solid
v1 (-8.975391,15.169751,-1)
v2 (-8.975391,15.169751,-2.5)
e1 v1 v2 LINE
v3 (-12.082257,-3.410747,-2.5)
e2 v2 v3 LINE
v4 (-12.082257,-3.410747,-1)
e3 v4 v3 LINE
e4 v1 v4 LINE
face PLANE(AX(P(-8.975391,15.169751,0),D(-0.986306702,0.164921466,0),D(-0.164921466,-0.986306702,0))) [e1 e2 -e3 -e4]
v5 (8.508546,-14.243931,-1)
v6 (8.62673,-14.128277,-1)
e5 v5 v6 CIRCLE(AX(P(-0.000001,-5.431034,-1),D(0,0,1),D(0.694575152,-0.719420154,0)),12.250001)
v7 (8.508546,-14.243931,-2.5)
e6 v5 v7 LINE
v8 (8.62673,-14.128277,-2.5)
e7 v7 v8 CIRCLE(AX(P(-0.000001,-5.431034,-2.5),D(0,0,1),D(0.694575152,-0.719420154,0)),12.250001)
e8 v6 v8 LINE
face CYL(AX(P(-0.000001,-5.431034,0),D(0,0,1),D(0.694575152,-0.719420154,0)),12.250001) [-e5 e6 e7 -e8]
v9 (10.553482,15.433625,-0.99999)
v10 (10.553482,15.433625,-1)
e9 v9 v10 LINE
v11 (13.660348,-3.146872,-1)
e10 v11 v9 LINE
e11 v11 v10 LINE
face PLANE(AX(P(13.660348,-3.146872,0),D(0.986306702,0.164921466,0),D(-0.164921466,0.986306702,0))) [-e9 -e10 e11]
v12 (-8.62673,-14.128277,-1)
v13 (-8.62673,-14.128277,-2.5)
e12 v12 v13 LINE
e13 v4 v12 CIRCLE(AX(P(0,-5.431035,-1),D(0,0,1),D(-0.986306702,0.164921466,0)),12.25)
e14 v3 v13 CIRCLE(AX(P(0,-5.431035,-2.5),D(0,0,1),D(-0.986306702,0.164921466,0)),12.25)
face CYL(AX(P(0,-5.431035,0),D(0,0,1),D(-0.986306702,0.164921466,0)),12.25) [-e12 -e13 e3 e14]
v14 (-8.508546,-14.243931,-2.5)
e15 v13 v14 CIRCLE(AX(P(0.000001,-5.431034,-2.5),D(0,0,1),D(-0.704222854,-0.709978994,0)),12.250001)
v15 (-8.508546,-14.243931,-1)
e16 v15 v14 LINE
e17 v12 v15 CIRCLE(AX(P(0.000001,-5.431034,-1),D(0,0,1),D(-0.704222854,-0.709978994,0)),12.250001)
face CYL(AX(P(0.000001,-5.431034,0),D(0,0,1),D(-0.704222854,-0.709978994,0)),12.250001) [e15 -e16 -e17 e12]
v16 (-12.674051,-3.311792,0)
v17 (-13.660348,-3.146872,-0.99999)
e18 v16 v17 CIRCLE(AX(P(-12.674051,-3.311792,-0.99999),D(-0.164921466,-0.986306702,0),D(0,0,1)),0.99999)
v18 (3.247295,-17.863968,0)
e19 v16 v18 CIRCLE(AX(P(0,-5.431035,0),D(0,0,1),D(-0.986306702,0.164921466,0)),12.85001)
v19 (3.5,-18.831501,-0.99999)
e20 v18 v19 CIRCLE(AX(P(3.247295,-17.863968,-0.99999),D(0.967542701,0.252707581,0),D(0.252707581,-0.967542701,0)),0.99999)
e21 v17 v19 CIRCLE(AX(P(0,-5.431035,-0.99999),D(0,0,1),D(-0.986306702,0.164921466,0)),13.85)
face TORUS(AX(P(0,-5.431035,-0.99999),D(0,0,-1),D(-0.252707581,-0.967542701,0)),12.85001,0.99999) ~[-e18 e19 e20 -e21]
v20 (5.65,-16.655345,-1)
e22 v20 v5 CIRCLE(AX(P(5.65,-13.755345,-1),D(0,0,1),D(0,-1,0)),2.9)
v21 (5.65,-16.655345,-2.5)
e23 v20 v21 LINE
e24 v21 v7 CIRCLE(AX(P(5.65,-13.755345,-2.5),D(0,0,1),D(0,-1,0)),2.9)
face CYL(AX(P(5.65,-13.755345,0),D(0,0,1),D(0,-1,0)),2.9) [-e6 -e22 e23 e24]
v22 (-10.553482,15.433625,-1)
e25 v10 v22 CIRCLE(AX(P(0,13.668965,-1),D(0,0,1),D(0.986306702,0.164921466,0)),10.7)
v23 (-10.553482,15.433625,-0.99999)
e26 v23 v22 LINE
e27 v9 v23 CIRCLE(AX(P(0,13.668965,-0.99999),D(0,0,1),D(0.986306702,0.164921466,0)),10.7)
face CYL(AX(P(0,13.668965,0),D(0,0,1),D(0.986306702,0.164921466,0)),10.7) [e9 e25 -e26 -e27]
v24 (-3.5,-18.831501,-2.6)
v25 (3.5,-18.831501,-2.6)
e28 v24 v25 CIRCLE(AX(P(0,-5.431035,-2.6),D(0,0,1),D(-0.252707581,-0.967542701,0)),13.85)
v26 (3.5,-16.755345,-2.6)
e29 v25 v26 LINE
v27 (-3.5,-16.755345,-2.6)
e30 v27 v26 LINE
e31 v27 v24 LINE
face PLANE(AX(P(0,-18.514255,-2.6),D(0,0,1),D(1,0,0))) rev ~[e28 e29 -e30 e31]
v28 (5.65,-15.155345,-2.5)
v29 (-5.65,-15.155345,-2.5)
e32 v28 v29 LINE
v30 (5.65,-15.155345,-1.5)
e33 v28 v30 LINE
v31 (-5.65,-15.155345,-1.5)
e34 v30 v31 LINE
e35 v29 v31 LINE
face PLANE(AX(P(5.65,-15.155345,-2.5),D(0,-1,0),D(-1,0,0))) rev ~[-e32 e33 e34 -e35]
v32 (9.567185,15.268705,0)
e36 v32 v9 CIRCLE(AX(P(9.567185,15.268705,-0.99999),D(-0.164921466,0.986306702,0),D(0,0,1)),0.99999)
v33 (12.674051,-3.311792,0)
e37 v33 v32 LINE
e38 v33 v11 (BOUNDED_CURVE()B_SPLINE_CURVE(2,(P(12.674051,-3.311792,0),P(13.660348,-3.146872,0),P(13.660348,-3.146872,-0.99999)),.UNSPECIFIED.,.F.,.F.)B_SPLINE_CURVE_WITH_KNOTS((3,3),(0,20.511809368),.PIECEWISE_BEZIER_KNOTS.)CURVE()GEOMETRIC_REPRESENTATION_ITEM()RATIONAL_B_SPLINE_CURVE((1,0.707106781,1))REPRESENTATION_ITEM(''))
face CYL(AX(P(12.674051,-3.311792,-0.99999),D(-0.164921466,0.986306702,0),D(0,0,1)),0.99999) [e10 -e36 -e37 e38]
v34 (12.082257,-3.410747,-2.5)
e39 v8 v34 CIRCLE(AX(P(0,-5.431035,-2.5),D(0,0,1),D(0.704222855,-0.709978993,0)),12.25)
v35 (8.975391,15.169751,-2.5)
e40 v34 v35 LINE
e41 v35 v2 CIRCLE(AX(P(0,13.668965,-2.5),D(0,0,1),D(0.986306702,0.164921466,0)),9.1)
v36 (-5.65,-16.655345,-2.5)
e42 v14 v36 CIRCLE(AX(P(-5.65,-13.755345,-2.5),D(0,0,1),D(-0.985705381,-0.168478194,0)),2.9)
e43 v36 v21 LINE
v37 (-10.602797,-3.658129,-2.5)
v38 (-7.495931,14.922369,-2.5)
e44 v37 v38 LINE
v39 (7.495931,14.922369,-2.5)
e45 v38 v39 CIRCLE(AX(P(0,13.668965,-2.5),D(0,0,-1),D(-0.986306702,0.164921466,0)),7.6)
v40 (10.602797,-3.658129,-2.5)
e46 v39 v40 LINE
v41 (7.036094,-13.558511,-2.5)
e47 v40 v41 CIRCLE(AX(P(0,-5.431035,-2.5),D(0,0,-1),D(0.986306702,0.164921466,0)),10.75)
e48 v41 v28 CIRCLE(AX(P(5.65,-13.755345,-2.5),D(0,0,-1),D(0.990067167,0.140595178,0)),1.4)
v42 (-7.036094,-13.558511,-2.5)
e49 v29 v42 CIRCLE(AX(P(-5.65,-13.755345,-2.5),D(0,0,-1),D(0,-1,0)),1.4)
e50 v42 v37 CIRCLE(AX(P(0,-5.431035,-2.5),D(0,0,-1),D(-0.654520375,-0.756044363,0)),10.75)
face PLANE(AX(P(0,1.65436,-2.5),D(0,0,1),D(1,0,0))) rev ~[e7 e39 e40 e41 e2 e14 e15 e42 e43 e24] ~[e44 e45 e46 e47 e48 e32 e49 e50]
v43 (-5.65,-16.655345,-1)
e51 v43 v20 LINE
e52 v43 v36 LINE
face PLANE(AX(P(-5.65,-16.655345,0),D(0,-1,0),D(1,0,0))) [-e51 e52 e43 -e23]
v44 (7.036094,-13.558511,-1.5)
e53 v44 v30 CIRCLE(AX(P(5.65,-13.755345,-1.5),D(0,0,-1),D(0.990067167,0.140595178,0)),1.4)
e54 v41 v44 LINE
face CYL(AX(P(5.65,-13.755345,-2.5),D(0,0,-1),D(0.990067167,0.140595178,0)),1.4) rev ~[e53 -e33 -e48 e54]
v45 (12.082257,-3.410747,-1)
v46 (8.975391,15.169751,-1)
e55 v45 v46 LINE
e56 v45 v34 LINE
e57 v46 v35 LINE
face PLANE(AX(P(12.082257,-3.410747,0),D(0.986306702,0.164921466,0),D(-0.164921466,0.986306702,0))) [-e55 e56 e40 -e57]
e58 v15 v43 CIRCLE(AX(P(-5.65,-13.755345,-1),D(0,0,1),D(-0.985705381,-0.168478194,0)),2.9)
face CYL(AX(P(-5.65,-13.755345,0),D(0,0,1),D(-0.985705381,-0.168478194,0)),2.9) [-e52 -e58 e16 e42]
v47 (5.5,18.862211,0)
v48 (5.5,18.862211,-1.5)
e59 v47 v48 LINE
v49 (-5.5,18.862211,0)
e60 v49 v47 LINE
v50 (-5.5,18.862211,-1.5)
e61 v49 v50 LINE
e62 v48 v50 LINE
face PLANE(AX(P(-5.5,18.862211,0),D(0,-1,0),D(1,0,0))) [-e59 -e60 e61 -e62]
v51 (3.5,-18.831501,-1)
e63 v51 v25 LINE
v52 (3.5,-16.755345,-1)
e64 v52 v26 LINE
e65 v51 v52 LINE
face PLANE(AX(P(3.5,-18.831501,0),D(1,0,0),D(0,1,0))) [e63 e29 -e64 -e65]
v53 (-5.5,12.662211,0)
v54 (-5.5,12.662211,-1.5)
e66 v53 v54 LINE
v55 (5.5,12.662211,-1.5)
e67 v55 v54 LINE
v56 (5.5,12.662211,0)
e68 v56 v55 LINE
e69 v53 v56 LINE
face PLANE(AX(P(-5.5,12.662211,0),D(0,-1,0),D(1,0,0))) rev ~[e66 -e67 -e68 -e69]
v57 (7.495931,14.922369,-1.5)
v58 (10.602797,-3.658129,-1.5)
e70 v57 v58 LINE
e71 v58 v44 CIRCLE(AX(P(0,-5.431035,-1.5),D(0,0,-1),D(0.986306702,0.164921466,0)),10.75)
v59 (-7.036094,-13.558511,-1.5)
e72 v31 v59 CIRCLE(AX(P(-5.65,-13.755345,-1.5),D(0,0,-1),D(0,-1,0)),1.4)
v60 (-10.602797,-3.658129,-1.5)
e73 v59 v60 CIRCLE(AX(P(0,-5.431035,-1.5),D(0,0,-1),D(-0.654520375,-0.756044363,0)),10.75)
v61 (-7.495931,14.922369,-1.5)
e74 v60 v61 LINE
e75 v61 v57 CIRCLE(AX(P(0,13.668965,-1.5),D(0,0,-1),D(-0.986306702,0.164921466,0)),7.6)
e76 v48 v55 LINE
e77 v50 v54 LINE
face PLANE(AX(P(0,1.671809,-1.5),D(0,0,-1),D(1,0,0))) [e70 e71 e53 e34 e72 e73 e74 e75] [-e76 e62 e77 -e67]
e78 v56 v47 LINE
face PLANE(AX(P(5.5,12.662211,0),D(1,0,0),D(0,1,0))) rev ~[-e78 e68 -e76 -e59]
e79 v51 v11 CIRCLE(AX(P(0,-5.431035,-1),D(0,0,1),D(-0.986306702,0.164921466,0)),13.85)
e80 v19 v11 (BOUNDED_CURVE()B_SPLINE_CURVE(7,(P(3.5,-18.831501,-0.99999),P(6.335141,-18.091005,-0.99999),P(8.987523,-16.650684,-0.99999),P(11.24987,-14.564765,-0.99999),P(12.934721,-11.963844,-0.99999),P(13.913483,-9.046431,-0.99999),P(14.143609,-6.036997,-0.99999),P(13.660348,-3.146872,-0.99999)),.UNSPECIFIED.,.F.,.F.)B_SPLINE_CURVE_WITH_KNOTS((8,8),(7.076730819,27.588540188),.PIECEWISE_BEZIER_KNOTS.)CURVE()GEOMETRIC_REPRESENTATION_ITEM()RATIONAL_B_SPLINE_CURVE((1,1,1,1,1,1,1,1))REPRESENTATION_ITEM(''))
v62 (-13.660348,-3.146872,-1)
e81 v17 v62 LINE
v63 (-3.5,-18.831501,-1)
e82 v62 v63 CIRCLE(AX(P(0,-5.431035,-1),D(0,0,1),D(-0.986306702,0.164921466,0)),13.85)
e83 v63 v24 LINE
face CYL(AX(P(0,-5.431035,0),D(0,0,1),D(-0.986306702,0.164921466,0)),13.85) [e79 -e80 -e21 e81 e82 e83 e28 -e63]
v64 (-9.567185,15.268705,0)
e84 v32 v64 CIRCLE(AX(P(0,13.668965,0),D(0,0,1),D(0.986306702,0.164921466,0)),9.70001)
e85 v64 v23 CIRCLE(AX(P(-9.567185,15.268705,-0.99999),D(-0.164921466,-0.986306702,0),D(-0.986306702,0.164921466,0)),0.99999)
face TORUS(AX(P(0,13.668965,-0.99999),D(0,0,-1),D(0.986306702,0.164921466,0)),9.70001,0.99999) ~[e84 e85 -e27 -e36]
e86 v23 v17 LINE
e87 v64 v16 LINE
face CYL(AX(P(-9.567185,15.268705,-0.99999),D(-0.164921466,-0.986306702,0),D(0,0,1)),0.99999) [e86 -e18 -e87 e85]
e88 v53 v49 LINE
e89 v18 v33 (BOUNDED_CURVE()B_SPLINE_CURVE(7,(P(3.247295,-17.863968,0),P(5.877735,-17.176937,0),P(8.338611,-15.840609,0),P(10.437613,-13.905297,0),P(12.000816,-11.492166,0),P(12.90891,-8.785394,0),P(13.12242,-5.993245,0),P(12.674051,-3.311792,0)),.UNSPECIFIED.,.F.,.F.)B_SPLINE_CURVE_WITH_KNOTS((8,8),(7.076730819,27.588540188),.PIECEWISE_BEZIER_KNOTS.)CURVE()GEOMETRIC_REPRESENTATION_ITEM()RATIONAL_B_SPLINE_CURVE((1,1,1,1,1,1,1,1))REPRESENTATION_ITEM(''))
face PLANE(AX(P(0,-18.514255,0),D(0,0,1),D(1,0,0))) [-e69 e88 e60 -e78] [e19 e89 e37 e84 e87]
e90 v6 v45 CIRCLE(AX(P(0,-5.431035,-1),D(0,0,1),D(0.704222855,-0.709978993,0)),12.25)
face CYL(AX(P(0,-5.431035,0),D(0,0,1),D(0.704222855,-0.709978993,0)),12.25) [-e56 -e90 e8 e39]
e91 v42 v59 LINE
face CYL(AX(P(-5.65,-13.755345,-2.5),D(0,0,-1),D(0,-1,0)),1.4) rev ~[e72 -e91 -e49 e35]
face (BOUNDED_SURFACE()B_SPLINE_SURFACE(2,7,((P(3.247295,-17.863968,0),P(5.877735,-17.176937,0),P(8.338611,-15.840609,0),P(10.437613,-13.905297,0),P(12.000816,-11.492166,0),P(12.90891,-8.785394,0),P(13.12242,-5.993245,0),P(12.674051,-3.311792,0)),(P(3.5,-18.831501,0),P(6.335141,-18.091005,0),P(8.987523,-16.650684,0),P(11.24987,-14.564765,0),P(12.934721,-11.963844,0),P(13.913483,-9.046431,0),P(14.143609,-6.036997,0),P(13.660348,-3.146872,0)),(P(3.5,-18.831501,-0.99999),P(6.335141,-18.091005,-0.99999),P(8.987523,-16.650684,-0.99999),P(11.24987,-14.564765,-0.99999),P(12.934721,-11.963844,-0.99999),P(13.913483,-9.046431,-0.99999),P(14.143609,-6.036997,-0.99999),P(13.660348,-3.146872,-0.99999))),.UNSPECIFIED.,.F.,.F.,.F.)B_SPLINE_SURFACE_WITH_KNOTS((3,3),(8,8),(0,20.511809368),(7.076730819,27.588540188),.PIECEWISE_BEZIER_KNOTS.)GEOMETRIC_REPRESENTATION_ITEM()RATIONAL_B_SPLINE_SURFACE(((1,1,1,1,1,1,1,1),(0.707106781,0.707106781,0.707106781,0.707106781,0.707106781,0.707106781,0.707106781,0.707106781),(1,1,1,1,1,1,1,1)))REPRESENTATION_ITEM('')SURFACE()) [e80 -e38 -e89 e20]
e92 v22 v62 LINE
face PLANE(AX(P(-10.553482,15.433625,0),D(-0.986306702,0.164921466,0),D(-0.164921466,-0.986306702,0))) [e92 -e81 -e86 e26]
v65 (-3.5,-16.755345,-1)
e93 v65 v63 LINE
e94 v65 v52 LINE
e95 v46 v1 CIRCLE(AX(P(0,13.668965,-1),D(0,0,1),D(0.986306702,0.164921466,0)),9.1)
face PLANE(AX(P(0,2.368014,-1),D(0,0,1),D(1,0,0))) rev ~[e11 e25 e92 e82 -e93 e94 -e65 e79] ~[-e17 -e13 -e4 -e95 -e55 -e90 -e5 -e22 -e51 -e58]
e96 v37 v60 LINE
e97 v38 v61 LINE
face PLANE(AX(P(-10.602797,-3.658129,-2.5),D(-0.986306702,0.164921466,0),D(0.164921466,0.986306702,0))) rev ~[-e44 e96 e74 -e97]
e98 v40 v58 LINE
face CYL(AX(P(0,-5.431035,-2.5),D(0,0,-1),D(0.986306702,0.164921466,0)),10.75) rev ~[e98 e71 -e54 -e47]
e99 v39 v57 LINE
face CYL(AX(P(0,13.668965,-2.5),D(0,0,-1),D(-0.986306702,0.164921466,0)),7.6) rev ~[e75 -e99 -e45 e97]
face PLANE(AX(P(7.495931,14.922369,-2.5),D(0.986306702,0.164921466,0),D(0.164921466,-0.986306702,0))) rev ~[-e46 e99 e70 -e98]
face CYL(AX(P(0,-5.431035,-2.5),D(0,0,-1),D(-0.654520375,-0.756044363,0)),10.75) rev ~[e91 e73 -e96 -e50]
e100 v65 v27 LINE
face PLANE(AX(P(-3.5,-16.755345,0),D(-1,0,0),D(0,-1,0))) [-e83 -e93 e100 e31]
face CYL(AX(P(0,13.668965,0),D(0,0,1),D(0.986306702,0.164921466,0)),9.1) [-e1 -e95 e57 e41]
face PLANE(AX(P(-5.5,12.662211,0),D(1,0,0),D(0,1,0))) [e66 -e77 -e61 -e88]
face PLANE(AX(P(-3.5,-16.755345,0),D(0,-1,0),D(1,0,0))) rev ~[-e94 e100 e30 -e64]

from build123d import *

# Parameters (mm, degrees)
F1_DEPTH = 1
F2_W     = 0.6565612018
F2_H     = 2.5395583361
F2_W_2   = 0.6960576609
F2_W_3   = 0.8317038625
F2_H_2   = 3.7825570011
F2_W_4   = 0.7836289912
F3_DEPTH = 2.5
F2_W_5   = 7
F2_H_3   = 1.2
F4_DEPTH = 2.6
F6_DEPTH = 1
F7_R     = 0.99999
F8_W     = 11
F8_H     = 6.2
F9_DEPTH = 6


# Not quite as in the source:
# - a fillet or chamfer is up to 0.001 mm smaller than in the source, because OpenCascade refuses the exact size


with BuildPart() as f1:
    # F0 (on Top) → F1 (new body)
    with BuildSketch(Plane.XY):
        with BuildLine():
            ThreePointArc((10.5534817095, 15.4336250836), (0, 24.3689653978), (-10.5534817095, 15.4336250836))
            Line((-10.5534817095, 15.4336250836), (-13.6603478203, -3.1468722986))
            ThreePointArc((-13.6603478203, -3.1468722986), (0, -19.2810346022), (13.6603478203, -3.1468722986))
            Line((13.6603478203, -3.1468722986), (10.5534817095, 15.4336250836))
        make_face()
        with BuildLine():
            ThreePointArc((-12.1808877675, -3.3942544975), (-10.7458713669, 0.6557337165), (-8.0101498113, 3.9689653978))
            ThreePointArc((-8.0101498113, 3.9689653978), (-7.3298242511, 6.556361809), (-8.0101498113, 9.1437582202))
            ThreePointArc((-8.0101498113, 9.1437582202), (-9.0606365073, 12.0737017575), (-9.0740216568, 15.1862428847))
            ThreePointArc((-9.0740216568, 15.1862428847), (0, 22.8689653978), (9.0740216568, 15.1862428847))
            ThreePointArc((9.0740216568, 15.1862428847), (9.0606535532, 12.0737985759), (8.0102465186, 9.1439294077))
            ThreePointArc((8.0102465186, 9.1439294077), (8.0101981654, 9.1438438137), (8.0101498113, 9.1437582202))
            ThreePointArc((8.0101498113, 9.1437582202), (7.3298242511, 6.556361809), (8.0101498113, 3.9689653978))
            ThreePointArc((8.0101498113, 3.9689653978), (10.7458713669, 0.6557337165), (12.1808877675, -3.3942544975))
            ThreePointArc((12.1808877675, -3.3942544975), (0, -17.7810346022), (-12.1808877675, -3.3942544975))
        make_face(mode=Mode.SUBTRACT)
        with BuildLine():
            Line((8.0101498113, 3.9689653978), (-8.0101498113, 3.9689653978))
            ThreePointArc((-8.0101498113, 3.9689653978), (-10.7458713669, 0.6557337165), (-12.1808877675, -3.3942544975))
            ThreePointArc((-12.1808877675, -3.3942544975), (0, -17.7810346022), (12.1808877675, -3.3942544975))
            ThreePointArc((12.1808877675, -3.3942544975), (10.7458713669, 0.6557337165), (8.0101498113, 3.9689653978))
        make_face()
        with BuildLine():
            ThreePointArc((-8.0101498113, 9.1437582202), (-7.3298242511, 6.556361809), (-8.0101498113, 3.9689653978))
            Line((-8.0101498113, 3.9689653978), (8.0101498113, 3.9689653978))
            ThreePointArc((8.0101498113, 3.9689653978), (7.3298242511, 6.556361809), (8.0101498113, 9.1437582202))
            ThreePointArc((8.0101498113, 9.1437582202), (0, 4.4689653978), (-8.0101498113, 9.1437582202))
        make_face()
        with BuildLine():
            ThreePointArc((-9.0740216568, 15.1862428847), (-9.0606365073, 12.0737017575), (-8.0101498113, 9.1437582202))
            ThreePointArc((-8.0101498113, 9.1437582202), (0, 4.4689653978), (8.0101498113, 9.1437582202))
            ThreePointArc((8.0101498113, 9.1437582202), (8.0101981654, 9.1438438137), (8.0102465186, 9.1439294077))
            ThreePointArc((8.0102465186, 9.1439294077), (9.0606535532, 12.0737985759), (9.0740216568, 15.1862428847))
            ThreePointArc((9.0740216568, 15.1862428847), (0, 22.8689653978), (-9.0740216568, 15.1862428847))
        make_face()
    extrude(amount=-F1_DEPTH)

    # F2 (on face) → F3 (join)
    with BuildSketch(Plane.XY):
        with BuildLine():
            ThreePointArc((-12.0822570973, -3.4107466441), (-11.6589837477, -9.190103366), (-8.626729972, -14.1282772682))
            ThreePointArc((-8.626729972, -14.1282772682), (-8.5678329378, -14.1863038014), (-8.5085456051, -14.2439314975))
            ThreePointArc((-8.5085456051, -14.2439314975), (-7.5199061996, -15.9719752427), (-5.65, -16.6553447357))
            Line((-5.65, -16.6553447357), (5.65, -16.6553447357))
            ThreePointArc((5.65, -16.6553447357), (7.5199061996, -15.9719752427), (8.5085456051, -14.2439314975))
            ThreePointArc((8.5085456051, -14.2439314975), (8.5678329378, -14.1863038014), (8.626729972, -14.1282772682))
            ThreePointArc((8.626729972, -14.1282772682), (11.6589837477, -9.190103366), (12.0822570973, -3.4107466441))
            Line((12.0822570973, -3.4107466441), (8.9753909866, 15.1697507381))
            ThreePointArc((8.9753909866, 15.1697507381), (0, 22.7689653978), (-8.9753909866, 15.1697507381))
            Line((-8.9753909866, 15.1697507381), (-12.0822570973, -3.4107466441))
        make_face()
        with Locations((-8.9782806009, -11.8910893798)):
            Rectangle(F2_W, F2_H, mode=Mode.SUBTRACT)
        with Locations((8.9980288304, -11.8910893798)):
            Rectangle(F2_W_2, F2_H, mode=Mode.SUBTRACT)
        with Locations((-9.0658519313, 9.3533767637)):
            Rectangle(F2_W_3, F2_H_2, mode=Mode.SUBTRACT)
        with Locations((9.0418144956, 9.3533767637)):
            Rectangle(F2_W_4, F2_H_2, mode=Mode.SUBTRACT)
        with Locations((-9.0658519313, 9.3533767637)):
            Rectangle(F2_W_3, F2_H_2)
        with Locations((9.0418144956, 9.3533767637)):
            Rectangle(F2_W_4, F2_H_2)
        with Locations((8.9980288304, -11.8910893798)):
            Rectangle(F2_W_2, F2_H)
        with Locations((-8.9782806009, -11.8910893798)):
            Rectangle(F2_W, F2_H)
    extrude(amount=-F3_DEPTH)

    # F2 (on face) → F4 (join)
    with BuildSketch(Plane.XY):
        with BuildLine():
            Line((3.5, -17.9553447357), (-3.5, -17.9553447357))
            Line((-3.5, -17.9553447357), (-3.5, -18.831501012))
            ThreePointArc((-3.5, -18.831501012), (0, -19.2810346022), (3.5, -18.831501012))
            Line((3.5, -18.831501012), (3.5, -17.9553447357))
        make_face()
        with Locations((0, -17.3553447357)):
            Rectangle(F2_W_5, F2_H_3)
    extrude(amount=-F4_DEPTH)

    # F5 (on face) → F6 (cut)
    with BuildSketch(Plane(origin=(0, 0, -2.5), x_dir=(1, 0, 0), z_dir=(0, 0, -1))):
        with BuildLine():
            Line((-10.602797021, 3.658128847), (-7.4959309103, -14.9223685352))
            ThreePointArc((-7.4959309103, -14.9223685352), (0, -21.2689653739), (7.4959309103, -14.9223685352))
            Line((7.4959309103, -14.9223685352), (10.602797021, 3.658128847))
            ThreePointArc((10.602797021, 3.658128847), (10.1137042336, 9.0745886584), (7.0360940107, 13.5585114899))
            ThreePointArc((7.0360940107, 13.5585114899), (6.7072526833, 14.6730683852), (5.65, 15.1553447118))
            Line((5.65, 15.1553447118), (-5.65, 15.1553447118))
            ThreePointArc((-5.65, 15.1553447118), (-6.7072526833, 14.6730683852), (-7.0360940107, 13.5585114899))
            ThreePointArc((-7.0360940107, 13.5585114899), (-10.1137042336, 9.0745886584), (-10.602797021, 3.658128847))
        make_face()
    extrude(amount=-F6_DEPTH, mode=Mode.SUBTRACT)

    # F7 (radius 1 in the source; OpenCascade refuses exactly that, so slightly less here)
    f7_edges = [f1.edges().sort_by_distance(p)[0] for p in [
        (0, -19.281035, 0),
        (0, 24.368965, 0),
        (12.106915, 6.143376, 0),
        (-12.106915, 6.143376, 0),
    ]]
    fillet(f7_edges, radius=F7_R)

    # F8 (on face) → F9 (cut)
    with BuildSketch(Plane.XY):
        with Locations((0, 15.7622105017)):
            Rectangle(F8_W, F8_H)
    extrude(amount=-F9_DEPTH, mode=Mode.SUBTRACT)


solid = f1.part
